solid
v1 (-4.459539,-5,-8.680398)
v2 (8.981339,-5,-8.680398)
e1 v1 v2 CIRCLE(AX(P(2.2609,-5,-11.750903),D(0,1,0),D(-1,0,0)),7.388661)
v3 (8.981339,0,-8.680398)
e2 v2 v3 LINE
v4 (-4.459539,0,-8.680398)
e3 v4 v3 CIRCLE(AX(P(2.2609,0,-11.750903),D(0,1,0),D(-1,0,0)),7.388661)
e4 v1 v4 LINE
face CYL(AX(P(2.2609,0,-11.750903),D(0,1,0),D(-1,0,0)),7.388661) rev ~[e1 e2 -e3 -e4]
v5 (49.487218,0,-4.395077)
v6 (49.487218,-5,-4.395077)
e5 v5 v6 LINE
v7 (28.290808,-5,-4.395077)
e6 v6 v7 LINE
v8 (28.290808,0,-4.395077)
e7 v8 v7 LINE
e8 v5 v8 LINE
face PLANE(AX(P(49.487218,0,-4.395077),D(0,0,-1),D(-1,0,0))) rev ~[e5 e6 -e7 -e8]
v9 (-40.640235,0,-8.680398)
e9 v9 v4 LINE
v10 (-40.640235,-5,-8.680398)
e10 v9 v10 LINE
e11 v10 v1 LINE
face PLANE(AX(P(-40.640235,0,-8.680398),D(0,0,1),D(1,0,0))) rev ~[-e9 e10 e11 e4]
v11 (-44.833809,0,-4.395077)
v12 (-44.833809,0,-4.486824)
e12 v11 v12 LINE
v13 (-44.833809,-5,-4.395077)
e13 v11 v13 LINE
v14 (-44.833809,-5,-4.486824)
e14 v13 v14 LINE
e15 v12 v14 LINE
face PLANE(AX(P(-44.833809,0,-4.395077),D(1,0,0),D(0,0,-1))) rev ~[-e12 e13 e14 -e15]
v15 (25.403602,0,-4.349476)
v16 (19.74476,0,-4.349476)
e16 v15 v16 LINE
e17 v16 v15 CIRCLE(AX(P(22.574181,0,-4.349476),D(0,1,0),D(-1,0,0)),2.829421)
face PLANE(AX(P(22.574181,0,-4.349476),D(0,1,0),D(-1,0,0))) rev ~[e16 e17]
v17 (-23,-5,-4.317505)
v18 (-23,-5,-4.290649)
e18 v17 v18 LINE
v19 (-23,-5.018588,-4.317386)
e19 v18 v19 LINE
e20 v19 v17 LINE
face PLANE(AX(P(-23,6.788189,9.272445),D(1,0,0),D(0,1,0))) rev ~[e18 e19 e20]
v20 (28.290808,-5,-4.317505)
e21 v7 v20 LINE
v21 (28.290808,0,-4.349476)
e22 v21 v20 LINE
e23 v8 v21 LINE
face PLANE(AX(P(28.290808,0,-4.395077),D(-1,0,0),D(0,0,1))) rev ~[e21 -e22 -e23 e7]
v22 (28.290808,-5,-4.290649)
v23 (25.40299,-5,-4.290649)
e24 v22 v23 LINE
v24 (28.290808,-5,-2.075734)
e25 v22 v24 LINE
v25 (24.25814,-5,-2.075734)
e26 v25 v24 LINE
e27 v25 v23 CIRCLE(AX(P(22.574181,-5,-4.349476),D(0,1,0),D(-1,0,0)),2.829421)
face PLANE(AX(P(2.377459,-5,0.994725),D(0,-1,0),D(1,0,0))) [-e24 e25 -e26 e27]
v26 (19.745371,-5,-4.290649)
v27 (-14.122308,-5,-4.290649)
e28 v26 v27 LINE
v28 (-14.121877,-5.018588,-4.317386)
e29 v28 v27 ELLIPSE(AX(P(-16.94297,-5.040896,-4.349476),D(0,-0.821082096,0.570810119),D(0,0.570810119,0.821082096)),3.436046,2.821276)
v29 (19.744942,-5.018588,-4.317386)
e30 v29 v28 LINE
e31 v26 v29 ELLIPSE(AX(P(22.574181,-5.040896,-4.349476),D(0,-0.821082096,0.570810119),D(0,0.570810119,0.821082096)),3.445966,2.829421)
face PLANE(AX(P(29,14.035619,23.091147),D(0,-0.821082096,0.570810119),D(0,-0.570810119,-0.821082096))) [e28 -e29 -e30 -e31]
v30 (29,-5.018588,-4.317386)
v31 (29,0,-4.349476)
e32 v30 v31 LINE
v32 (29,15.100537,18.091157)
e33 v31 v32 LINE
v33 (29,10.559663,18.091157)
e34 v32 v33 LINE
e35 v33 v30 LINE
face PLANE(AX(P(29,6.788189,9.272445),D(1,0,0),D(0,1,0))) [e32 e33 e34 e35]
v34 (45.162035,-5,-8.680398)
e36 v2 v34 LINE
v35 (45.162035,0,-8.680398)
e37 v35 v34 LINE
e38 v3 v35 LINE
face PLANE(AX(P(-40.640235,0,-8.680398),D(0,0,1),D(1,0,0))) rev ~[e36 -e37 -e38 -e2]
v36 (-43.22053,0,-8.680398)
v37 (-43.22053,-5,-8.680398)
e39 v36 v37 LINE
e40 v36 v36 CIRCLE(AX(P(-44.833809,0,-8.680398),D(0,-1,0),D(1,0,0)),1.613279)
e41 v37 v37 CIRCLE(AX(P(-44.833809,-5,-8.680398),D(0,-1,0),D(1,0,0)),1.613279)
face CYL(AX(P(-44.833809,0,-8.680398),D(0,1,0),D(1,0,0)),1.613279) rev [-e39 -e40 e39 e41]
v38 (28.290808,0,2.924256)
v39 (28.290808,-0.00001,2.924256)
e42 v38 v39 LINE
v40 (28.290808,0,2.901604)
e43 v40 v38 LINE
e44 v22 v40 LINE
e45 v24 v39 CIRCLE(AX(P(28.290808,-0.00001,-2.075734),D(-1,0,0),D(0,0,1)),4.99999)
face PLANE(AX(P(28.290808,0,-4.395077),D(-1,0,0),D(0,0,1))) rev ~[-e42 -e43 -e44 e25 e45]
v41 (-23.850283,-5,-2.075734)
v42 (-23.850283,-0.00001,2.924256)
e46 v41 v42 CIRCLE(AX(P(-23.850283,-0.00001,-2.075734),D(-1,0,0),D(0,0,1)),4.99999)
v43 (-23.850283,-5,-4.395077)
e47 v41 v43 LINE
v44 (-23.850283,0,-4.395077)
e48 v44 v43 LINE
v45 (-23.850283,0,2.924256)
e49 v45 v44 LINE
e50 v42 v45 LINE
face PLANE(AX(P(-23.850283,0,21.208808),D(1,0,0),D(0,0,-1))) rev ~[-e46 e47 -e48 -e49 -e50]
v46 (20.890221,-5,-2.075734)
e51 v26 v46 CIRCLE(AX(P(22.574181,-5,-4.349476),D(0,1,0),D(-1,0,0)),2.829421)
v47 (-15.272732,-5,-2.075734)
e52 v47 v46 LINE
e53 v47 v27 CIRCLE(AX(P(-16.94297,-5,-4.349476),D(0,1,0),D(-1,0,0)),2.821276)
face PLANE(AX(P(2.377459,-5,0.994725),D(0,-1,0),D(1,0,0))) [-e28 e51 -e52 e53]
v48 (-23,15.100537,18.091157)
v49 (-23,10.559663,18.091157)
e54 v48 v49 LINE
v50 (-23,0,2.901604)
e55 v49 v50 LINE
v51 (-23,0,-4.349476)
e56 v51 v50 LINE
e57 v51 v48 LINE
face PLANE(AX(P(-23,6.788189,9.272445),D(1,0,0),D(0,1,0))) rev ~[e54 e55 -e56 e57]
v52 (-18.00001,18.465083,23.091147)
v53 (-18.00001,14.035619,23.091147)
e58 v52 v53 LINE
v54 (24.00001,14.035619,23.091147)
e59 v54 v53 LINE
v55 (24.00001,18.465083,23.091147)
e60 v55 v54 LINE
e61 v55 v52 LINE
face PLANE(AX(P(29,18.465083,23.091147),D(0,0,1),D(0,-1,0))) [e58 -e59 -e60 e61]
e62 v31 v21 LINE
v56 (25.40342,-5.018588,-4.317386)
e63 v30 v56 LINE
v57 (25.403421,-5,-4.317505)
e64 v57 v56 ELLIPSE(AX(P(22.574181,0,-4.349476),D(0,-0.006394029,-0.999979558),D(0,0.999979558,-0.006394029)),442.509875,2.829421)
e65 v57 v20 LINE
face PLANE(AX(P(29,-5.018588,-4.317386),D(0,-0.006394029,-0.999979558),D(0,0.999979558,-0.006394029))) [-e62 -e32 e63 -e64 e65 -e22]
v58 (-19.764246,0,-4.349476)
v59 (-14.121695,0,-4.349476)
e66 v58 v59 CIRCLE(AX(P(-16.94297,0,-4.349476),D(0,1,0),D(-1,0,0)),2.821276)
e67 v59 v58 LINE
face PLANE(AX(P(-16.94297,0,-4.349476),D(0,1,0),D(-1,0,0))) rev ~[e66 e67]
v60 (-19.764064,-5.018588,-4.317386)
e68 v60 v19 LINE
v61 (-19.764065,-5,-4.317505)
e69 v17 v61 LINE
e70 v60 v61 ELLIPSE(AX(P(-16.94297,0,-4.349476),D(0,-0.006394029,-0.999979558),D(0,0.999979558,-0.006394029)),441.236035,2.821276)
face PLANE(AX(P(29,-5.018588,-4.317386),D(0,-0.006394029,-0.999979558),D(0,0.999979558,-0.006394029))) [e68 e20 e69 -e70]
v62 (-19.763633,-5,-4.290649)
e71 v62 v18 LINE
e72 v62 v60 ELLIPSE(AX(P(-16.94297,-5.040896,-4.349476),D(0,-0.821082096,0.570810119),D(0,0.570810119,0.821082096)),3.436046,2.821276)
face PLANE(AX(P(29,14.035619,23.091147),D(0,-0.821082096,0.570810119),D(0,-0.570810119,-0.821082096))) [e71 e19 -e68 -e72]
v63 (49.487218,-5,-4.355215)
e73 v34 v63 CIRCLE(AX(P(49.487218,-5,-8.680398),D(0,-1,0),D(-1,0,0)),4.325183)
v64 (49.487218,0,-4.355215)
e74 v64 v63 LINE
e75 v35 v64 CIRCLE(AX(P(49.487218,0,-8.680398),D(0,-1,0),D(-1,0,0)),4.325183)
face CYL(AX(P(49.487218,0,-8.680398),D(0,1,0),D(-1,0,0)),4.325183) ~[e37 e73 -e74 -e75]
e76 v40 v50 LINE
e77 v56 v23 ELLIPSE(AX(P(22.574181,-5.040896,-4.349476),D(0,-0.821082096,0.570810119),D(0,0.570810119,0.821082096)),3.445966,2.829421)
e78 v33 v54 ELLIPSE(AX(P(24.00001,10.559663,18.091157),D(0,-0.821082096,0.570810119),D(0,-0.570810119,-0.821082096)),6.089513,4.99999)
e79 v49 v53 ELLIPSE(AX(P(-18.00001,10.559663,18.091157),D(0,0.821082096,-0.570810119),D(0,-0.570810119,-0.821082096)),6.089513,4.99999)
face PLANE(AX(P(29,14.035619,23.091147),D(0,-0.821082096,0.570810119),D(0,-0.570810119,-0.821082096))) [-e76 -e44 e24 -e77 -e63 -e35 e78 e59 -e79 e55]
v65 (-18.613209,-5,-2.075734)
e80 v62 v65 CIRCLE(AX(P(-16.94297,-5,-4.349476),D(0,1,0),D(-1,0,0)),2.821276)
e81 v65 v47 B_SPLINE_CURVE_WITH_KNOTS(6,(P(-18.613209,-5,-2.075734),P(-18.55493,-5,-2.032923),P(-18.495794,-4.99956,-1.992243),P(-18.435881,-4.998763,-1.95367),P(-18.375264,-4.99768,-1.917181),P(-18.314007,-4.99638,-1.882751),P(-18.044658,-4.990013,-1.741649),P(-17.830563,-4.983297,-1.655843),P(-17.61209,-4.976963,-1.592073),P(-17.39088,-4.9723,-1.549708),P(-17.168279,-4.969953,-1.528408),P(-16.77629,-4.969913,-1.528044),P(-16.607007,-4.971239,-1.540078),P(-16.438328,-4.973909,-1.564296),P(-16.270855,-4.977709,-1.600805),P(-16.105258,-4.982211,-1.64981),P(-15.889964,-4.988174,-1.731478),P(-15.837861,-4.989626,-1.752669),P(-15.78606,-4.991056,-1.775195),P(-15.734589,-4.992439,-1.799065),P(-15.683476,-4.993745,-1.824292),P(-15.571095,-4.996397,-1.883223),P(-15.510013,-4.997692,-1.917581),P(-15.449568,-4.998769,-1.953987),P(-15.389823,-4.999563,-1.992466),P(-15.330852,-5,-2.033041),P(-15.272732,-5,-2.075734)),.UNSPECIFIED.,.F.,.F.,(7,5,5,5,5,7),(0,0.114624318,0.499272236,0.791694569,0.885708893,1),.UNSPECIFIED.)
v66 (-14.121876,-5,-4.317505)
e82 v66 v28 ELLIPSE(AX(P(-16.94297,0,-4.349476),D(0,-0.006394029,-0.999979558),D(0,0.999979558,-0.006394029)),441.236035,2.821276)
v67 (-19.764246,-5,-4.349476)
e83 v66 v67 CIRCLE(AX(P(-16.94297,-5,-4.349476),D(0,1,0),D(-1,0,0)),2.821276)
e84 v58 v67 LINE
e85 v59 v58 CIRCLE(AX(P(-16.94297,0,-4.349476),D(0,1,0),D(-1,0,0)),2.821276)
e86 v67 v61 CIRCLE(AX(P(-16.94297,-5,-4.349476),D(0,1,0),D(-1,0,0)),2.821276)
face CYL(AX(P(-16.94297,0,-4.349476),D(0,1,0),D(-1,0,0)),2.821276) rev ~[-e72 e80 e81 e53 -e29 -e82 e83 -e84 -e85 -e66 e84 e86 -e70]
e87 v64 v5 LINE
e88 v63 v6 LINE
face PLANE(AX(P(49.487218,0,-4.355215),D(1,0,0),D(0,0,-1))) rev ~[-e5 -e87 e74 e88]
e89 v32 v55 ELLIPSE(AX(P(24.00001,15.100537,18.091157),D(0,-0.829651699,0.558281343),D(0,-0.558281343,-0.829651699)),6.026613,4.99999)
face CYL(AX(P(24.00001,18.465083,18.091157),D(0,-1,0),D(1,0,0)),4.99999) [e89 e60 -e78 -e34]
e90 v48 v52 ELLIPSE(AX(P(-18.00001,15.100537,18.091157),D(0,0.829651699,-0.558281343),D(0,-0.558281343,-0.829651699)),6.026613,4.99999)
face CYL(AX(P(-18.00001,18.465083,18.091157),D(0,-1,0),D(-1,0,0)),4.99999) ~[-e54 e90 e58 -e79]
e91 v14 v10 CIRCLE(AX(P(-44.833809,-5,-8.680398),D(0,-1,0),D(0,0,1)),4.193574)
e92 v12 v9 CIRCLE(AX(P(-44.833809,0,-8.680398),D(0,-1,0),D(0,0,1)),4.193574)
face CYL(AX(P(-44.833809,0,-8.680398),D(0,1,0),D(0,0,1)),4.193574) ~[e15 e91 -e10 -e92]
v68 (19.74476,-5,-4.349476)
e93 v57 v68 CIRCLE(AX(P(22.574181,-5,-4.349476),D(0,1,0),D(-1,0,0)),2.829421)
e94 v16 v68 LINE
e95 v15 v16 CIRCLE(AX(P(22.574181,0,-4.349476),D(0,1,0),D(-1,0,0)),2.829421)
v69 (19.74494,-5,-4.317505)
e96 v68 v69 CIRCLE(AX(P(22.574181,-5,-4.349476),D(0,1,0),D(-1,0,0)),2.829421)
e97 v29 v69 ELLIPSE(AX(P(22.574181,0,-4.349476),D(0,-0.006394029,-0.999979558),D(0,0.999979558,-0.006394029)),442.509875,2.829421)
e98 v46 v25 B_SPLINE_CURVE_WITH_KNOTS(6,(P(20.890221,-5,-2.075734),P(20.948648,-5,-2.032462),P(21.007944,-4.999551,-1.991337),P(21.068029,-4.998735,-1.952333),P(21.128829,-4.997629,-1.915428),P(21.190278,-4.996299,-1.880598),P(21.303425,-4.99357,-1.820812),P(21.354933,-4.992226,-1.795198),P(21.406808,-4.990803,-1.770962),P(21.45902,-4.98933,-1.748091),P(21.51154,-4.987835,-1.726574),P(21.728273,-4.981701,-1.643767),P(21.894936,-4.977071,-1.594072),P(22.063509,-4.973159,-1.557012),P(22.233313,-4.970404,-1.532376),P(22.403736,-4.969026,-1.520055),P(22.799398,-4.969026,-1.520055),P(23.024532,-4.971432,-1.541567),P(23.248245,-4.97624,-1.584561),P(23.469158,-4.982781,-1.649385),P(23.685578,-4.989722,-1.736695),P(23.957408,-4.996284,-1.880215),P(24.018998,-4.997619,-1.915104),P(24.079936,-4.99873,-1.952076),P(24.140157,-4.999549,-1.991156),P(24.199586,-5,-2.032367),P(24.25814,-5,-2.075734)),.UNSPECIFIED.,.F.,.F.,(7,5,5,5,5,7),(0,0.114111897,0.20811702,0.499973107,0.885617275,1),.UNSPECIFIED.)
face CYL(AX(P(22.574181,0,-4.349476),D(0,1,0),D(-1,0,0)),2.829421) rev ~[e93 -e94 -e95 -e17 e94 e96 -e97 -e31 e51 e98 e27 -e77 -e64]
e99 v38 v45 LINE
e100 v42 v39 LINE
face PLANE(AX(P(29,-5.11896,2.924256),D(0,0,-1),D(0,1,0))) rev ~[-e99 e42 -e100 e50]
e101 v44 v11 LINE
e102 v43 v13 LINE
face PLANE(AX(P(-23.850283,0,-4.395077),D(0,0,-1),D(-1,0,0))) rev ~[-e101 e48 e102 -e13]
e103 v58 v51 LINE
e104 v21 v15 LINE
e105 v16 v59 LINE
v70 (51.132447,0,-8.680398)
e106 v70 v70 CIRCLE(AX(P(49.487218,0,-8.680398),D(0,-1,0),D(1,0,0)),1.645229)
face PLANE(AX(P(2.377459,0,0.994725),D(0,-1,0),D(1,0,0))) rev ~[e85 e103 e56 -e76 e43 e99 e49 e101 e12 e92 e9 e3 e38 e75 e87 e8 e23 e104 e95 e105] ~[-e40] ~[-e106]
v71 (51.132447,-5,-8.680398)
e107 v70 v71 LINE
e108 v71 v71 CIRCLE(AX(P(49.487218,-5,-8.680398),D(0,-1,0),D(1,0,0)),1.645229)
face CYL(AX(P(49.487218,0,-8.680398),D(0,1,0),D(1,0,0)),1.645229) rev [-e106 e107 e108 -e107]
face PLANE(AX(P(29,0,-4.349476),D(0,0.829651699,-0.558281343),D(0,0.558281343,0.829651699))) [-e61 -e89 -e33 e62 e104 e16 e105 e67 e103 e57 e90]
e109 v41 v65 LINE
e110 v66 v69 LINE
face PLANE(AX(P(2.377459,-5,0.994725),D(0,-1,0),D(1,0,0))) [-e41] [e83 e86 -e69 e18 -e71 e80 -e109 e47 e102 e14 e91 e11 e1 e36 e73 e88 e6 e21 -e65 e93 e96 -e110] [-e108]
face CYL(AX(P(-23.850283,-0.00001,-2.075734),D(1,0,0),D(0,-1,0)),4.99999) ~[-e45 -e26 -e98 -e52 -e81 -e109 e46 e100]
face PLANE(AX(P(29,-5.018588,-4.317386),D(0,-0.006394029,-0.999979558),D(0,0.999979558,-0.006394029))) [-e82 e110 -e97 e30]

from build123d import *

# Parameters (mm, degrees)
F0_R     = 1.6132793462
F0_R_2   = 1.6452292319
F1_DEPTH = 5
F4_DEPTH = 52
F5_W     = 5.1189595833
F5_H     = 18.4771826025
F6_DEPTH = 78.0283830646
F7_R     = 4.99999
F8_R     = 2.8294209196
F8_R_2   = 2.8212759524
F8_R_3   = 7.3886605842
F9_DEPTH = 25


# Not quite as in the source:
# - a fillet or chamfer is up to 0.001 mm smaller than in the source, because OpenCascade refuses the exact size


with BuildPart() as f1:
    # F0 (on Front) → F1 (new body)
    with BuildSketch(Plane.XZ):
        with BuildLine():
            Line((-40.6402352101, -8.6803976446), (45.1620352523, -8.6803976446))
            ThreePointArc((45.1620352523, -8.6803976446), (52.5455844959, -11.7387638798), (49.4872182608, -4.3552146362))
            Line((49.4872182608, -4.3552146362), (49.4872182608, -4.395077005))
            Line((49.4872182608, -4.395077005), (28.2908082008, -4.395077005))
            Line((28.2908082008, -4.395077005), (28.2908082008, 21.208807826))
            Line((28.2908082008, 21.208807826), (-23.8502826542, 21.208807826))
            Line((-23.8502826542, 21.208807826), (-23.8502826542, -4.395077005))
            Line((-23.8502826542, -4.395077005), (-44.8338091373, -4.395077005))
            Line((-44.8338091373, -4.395077005), (-44.8338091373, -4.4868237174))
            ThreePointArc((-44.8338091373, -4.4868237174), (-47.7991136987, -11.645702206), (-40.6402352101, -8.6803976446))
        make_face()
        with Locations((-44.8338091373, -8.6803976446)):
            Circle(F0_R, mode=Mode.SUBTRACT)
        with Locations((49.4872182608, -8.6803976446)):
            Circle(F0_R_2, mode=Mode.SUBTRACT)
    extrude(amount=F1_DEPTH)

    # F3 (on offset) → F4 (join)
    with BuildSketch(Plane.YZ.offset(29)):
        Polygon((14.035618864, 23.0911467224), (-5.0185876898, -4.3173860759), (0, -4.3494757265), (18.4650830925, 23.0911467224), align=None)
    extrude(amount=-F4_DEPTH)

    # F5 (on offset) → F6 (cut, through all)
    with BuildSketch(Plane.YZ.offset(29)):
        with Locations((-2.5594797917, 12.1628475608)):
            Rectangle(F5_W, F5_H)
    extrude(amount=-F6_DEPTH, mode=Mode.SUBTRACT)

    # F7 (radius 5 in the source; OpenCascade refuses exactly that, so slightly less here)
    f7_edges = [f1.edges().sort_by_distance(p)[0] for p in [
        (-23, 16.250351, 23.091147),
        (29, 16.250351, 23.091147),
        (2.220263, -5, 2.924256),
    ]]
    fillet(f7_edges, radius=F7_R)

    # F8 (on face) → F9 (cut)
    with BuildSketch(Plane(origin=(0, 0, 0), x_dir=(-1, 0, 0), z_dir=(0, 1, 0))):
        with Locations((-22.5741807371, -4.3494757265)):
            Circle(F8_R)
        with Locations((16.9429704547, -4.3494757265)):
            Circle(F8_R_2)
        with Locations((-2.2609000211, -11.7509029806)):
            Circle(F8_R_3)
    extrude(amount=-F9_DEPTH, mode=Mode.SUBTRACT)


solid = f1.part
